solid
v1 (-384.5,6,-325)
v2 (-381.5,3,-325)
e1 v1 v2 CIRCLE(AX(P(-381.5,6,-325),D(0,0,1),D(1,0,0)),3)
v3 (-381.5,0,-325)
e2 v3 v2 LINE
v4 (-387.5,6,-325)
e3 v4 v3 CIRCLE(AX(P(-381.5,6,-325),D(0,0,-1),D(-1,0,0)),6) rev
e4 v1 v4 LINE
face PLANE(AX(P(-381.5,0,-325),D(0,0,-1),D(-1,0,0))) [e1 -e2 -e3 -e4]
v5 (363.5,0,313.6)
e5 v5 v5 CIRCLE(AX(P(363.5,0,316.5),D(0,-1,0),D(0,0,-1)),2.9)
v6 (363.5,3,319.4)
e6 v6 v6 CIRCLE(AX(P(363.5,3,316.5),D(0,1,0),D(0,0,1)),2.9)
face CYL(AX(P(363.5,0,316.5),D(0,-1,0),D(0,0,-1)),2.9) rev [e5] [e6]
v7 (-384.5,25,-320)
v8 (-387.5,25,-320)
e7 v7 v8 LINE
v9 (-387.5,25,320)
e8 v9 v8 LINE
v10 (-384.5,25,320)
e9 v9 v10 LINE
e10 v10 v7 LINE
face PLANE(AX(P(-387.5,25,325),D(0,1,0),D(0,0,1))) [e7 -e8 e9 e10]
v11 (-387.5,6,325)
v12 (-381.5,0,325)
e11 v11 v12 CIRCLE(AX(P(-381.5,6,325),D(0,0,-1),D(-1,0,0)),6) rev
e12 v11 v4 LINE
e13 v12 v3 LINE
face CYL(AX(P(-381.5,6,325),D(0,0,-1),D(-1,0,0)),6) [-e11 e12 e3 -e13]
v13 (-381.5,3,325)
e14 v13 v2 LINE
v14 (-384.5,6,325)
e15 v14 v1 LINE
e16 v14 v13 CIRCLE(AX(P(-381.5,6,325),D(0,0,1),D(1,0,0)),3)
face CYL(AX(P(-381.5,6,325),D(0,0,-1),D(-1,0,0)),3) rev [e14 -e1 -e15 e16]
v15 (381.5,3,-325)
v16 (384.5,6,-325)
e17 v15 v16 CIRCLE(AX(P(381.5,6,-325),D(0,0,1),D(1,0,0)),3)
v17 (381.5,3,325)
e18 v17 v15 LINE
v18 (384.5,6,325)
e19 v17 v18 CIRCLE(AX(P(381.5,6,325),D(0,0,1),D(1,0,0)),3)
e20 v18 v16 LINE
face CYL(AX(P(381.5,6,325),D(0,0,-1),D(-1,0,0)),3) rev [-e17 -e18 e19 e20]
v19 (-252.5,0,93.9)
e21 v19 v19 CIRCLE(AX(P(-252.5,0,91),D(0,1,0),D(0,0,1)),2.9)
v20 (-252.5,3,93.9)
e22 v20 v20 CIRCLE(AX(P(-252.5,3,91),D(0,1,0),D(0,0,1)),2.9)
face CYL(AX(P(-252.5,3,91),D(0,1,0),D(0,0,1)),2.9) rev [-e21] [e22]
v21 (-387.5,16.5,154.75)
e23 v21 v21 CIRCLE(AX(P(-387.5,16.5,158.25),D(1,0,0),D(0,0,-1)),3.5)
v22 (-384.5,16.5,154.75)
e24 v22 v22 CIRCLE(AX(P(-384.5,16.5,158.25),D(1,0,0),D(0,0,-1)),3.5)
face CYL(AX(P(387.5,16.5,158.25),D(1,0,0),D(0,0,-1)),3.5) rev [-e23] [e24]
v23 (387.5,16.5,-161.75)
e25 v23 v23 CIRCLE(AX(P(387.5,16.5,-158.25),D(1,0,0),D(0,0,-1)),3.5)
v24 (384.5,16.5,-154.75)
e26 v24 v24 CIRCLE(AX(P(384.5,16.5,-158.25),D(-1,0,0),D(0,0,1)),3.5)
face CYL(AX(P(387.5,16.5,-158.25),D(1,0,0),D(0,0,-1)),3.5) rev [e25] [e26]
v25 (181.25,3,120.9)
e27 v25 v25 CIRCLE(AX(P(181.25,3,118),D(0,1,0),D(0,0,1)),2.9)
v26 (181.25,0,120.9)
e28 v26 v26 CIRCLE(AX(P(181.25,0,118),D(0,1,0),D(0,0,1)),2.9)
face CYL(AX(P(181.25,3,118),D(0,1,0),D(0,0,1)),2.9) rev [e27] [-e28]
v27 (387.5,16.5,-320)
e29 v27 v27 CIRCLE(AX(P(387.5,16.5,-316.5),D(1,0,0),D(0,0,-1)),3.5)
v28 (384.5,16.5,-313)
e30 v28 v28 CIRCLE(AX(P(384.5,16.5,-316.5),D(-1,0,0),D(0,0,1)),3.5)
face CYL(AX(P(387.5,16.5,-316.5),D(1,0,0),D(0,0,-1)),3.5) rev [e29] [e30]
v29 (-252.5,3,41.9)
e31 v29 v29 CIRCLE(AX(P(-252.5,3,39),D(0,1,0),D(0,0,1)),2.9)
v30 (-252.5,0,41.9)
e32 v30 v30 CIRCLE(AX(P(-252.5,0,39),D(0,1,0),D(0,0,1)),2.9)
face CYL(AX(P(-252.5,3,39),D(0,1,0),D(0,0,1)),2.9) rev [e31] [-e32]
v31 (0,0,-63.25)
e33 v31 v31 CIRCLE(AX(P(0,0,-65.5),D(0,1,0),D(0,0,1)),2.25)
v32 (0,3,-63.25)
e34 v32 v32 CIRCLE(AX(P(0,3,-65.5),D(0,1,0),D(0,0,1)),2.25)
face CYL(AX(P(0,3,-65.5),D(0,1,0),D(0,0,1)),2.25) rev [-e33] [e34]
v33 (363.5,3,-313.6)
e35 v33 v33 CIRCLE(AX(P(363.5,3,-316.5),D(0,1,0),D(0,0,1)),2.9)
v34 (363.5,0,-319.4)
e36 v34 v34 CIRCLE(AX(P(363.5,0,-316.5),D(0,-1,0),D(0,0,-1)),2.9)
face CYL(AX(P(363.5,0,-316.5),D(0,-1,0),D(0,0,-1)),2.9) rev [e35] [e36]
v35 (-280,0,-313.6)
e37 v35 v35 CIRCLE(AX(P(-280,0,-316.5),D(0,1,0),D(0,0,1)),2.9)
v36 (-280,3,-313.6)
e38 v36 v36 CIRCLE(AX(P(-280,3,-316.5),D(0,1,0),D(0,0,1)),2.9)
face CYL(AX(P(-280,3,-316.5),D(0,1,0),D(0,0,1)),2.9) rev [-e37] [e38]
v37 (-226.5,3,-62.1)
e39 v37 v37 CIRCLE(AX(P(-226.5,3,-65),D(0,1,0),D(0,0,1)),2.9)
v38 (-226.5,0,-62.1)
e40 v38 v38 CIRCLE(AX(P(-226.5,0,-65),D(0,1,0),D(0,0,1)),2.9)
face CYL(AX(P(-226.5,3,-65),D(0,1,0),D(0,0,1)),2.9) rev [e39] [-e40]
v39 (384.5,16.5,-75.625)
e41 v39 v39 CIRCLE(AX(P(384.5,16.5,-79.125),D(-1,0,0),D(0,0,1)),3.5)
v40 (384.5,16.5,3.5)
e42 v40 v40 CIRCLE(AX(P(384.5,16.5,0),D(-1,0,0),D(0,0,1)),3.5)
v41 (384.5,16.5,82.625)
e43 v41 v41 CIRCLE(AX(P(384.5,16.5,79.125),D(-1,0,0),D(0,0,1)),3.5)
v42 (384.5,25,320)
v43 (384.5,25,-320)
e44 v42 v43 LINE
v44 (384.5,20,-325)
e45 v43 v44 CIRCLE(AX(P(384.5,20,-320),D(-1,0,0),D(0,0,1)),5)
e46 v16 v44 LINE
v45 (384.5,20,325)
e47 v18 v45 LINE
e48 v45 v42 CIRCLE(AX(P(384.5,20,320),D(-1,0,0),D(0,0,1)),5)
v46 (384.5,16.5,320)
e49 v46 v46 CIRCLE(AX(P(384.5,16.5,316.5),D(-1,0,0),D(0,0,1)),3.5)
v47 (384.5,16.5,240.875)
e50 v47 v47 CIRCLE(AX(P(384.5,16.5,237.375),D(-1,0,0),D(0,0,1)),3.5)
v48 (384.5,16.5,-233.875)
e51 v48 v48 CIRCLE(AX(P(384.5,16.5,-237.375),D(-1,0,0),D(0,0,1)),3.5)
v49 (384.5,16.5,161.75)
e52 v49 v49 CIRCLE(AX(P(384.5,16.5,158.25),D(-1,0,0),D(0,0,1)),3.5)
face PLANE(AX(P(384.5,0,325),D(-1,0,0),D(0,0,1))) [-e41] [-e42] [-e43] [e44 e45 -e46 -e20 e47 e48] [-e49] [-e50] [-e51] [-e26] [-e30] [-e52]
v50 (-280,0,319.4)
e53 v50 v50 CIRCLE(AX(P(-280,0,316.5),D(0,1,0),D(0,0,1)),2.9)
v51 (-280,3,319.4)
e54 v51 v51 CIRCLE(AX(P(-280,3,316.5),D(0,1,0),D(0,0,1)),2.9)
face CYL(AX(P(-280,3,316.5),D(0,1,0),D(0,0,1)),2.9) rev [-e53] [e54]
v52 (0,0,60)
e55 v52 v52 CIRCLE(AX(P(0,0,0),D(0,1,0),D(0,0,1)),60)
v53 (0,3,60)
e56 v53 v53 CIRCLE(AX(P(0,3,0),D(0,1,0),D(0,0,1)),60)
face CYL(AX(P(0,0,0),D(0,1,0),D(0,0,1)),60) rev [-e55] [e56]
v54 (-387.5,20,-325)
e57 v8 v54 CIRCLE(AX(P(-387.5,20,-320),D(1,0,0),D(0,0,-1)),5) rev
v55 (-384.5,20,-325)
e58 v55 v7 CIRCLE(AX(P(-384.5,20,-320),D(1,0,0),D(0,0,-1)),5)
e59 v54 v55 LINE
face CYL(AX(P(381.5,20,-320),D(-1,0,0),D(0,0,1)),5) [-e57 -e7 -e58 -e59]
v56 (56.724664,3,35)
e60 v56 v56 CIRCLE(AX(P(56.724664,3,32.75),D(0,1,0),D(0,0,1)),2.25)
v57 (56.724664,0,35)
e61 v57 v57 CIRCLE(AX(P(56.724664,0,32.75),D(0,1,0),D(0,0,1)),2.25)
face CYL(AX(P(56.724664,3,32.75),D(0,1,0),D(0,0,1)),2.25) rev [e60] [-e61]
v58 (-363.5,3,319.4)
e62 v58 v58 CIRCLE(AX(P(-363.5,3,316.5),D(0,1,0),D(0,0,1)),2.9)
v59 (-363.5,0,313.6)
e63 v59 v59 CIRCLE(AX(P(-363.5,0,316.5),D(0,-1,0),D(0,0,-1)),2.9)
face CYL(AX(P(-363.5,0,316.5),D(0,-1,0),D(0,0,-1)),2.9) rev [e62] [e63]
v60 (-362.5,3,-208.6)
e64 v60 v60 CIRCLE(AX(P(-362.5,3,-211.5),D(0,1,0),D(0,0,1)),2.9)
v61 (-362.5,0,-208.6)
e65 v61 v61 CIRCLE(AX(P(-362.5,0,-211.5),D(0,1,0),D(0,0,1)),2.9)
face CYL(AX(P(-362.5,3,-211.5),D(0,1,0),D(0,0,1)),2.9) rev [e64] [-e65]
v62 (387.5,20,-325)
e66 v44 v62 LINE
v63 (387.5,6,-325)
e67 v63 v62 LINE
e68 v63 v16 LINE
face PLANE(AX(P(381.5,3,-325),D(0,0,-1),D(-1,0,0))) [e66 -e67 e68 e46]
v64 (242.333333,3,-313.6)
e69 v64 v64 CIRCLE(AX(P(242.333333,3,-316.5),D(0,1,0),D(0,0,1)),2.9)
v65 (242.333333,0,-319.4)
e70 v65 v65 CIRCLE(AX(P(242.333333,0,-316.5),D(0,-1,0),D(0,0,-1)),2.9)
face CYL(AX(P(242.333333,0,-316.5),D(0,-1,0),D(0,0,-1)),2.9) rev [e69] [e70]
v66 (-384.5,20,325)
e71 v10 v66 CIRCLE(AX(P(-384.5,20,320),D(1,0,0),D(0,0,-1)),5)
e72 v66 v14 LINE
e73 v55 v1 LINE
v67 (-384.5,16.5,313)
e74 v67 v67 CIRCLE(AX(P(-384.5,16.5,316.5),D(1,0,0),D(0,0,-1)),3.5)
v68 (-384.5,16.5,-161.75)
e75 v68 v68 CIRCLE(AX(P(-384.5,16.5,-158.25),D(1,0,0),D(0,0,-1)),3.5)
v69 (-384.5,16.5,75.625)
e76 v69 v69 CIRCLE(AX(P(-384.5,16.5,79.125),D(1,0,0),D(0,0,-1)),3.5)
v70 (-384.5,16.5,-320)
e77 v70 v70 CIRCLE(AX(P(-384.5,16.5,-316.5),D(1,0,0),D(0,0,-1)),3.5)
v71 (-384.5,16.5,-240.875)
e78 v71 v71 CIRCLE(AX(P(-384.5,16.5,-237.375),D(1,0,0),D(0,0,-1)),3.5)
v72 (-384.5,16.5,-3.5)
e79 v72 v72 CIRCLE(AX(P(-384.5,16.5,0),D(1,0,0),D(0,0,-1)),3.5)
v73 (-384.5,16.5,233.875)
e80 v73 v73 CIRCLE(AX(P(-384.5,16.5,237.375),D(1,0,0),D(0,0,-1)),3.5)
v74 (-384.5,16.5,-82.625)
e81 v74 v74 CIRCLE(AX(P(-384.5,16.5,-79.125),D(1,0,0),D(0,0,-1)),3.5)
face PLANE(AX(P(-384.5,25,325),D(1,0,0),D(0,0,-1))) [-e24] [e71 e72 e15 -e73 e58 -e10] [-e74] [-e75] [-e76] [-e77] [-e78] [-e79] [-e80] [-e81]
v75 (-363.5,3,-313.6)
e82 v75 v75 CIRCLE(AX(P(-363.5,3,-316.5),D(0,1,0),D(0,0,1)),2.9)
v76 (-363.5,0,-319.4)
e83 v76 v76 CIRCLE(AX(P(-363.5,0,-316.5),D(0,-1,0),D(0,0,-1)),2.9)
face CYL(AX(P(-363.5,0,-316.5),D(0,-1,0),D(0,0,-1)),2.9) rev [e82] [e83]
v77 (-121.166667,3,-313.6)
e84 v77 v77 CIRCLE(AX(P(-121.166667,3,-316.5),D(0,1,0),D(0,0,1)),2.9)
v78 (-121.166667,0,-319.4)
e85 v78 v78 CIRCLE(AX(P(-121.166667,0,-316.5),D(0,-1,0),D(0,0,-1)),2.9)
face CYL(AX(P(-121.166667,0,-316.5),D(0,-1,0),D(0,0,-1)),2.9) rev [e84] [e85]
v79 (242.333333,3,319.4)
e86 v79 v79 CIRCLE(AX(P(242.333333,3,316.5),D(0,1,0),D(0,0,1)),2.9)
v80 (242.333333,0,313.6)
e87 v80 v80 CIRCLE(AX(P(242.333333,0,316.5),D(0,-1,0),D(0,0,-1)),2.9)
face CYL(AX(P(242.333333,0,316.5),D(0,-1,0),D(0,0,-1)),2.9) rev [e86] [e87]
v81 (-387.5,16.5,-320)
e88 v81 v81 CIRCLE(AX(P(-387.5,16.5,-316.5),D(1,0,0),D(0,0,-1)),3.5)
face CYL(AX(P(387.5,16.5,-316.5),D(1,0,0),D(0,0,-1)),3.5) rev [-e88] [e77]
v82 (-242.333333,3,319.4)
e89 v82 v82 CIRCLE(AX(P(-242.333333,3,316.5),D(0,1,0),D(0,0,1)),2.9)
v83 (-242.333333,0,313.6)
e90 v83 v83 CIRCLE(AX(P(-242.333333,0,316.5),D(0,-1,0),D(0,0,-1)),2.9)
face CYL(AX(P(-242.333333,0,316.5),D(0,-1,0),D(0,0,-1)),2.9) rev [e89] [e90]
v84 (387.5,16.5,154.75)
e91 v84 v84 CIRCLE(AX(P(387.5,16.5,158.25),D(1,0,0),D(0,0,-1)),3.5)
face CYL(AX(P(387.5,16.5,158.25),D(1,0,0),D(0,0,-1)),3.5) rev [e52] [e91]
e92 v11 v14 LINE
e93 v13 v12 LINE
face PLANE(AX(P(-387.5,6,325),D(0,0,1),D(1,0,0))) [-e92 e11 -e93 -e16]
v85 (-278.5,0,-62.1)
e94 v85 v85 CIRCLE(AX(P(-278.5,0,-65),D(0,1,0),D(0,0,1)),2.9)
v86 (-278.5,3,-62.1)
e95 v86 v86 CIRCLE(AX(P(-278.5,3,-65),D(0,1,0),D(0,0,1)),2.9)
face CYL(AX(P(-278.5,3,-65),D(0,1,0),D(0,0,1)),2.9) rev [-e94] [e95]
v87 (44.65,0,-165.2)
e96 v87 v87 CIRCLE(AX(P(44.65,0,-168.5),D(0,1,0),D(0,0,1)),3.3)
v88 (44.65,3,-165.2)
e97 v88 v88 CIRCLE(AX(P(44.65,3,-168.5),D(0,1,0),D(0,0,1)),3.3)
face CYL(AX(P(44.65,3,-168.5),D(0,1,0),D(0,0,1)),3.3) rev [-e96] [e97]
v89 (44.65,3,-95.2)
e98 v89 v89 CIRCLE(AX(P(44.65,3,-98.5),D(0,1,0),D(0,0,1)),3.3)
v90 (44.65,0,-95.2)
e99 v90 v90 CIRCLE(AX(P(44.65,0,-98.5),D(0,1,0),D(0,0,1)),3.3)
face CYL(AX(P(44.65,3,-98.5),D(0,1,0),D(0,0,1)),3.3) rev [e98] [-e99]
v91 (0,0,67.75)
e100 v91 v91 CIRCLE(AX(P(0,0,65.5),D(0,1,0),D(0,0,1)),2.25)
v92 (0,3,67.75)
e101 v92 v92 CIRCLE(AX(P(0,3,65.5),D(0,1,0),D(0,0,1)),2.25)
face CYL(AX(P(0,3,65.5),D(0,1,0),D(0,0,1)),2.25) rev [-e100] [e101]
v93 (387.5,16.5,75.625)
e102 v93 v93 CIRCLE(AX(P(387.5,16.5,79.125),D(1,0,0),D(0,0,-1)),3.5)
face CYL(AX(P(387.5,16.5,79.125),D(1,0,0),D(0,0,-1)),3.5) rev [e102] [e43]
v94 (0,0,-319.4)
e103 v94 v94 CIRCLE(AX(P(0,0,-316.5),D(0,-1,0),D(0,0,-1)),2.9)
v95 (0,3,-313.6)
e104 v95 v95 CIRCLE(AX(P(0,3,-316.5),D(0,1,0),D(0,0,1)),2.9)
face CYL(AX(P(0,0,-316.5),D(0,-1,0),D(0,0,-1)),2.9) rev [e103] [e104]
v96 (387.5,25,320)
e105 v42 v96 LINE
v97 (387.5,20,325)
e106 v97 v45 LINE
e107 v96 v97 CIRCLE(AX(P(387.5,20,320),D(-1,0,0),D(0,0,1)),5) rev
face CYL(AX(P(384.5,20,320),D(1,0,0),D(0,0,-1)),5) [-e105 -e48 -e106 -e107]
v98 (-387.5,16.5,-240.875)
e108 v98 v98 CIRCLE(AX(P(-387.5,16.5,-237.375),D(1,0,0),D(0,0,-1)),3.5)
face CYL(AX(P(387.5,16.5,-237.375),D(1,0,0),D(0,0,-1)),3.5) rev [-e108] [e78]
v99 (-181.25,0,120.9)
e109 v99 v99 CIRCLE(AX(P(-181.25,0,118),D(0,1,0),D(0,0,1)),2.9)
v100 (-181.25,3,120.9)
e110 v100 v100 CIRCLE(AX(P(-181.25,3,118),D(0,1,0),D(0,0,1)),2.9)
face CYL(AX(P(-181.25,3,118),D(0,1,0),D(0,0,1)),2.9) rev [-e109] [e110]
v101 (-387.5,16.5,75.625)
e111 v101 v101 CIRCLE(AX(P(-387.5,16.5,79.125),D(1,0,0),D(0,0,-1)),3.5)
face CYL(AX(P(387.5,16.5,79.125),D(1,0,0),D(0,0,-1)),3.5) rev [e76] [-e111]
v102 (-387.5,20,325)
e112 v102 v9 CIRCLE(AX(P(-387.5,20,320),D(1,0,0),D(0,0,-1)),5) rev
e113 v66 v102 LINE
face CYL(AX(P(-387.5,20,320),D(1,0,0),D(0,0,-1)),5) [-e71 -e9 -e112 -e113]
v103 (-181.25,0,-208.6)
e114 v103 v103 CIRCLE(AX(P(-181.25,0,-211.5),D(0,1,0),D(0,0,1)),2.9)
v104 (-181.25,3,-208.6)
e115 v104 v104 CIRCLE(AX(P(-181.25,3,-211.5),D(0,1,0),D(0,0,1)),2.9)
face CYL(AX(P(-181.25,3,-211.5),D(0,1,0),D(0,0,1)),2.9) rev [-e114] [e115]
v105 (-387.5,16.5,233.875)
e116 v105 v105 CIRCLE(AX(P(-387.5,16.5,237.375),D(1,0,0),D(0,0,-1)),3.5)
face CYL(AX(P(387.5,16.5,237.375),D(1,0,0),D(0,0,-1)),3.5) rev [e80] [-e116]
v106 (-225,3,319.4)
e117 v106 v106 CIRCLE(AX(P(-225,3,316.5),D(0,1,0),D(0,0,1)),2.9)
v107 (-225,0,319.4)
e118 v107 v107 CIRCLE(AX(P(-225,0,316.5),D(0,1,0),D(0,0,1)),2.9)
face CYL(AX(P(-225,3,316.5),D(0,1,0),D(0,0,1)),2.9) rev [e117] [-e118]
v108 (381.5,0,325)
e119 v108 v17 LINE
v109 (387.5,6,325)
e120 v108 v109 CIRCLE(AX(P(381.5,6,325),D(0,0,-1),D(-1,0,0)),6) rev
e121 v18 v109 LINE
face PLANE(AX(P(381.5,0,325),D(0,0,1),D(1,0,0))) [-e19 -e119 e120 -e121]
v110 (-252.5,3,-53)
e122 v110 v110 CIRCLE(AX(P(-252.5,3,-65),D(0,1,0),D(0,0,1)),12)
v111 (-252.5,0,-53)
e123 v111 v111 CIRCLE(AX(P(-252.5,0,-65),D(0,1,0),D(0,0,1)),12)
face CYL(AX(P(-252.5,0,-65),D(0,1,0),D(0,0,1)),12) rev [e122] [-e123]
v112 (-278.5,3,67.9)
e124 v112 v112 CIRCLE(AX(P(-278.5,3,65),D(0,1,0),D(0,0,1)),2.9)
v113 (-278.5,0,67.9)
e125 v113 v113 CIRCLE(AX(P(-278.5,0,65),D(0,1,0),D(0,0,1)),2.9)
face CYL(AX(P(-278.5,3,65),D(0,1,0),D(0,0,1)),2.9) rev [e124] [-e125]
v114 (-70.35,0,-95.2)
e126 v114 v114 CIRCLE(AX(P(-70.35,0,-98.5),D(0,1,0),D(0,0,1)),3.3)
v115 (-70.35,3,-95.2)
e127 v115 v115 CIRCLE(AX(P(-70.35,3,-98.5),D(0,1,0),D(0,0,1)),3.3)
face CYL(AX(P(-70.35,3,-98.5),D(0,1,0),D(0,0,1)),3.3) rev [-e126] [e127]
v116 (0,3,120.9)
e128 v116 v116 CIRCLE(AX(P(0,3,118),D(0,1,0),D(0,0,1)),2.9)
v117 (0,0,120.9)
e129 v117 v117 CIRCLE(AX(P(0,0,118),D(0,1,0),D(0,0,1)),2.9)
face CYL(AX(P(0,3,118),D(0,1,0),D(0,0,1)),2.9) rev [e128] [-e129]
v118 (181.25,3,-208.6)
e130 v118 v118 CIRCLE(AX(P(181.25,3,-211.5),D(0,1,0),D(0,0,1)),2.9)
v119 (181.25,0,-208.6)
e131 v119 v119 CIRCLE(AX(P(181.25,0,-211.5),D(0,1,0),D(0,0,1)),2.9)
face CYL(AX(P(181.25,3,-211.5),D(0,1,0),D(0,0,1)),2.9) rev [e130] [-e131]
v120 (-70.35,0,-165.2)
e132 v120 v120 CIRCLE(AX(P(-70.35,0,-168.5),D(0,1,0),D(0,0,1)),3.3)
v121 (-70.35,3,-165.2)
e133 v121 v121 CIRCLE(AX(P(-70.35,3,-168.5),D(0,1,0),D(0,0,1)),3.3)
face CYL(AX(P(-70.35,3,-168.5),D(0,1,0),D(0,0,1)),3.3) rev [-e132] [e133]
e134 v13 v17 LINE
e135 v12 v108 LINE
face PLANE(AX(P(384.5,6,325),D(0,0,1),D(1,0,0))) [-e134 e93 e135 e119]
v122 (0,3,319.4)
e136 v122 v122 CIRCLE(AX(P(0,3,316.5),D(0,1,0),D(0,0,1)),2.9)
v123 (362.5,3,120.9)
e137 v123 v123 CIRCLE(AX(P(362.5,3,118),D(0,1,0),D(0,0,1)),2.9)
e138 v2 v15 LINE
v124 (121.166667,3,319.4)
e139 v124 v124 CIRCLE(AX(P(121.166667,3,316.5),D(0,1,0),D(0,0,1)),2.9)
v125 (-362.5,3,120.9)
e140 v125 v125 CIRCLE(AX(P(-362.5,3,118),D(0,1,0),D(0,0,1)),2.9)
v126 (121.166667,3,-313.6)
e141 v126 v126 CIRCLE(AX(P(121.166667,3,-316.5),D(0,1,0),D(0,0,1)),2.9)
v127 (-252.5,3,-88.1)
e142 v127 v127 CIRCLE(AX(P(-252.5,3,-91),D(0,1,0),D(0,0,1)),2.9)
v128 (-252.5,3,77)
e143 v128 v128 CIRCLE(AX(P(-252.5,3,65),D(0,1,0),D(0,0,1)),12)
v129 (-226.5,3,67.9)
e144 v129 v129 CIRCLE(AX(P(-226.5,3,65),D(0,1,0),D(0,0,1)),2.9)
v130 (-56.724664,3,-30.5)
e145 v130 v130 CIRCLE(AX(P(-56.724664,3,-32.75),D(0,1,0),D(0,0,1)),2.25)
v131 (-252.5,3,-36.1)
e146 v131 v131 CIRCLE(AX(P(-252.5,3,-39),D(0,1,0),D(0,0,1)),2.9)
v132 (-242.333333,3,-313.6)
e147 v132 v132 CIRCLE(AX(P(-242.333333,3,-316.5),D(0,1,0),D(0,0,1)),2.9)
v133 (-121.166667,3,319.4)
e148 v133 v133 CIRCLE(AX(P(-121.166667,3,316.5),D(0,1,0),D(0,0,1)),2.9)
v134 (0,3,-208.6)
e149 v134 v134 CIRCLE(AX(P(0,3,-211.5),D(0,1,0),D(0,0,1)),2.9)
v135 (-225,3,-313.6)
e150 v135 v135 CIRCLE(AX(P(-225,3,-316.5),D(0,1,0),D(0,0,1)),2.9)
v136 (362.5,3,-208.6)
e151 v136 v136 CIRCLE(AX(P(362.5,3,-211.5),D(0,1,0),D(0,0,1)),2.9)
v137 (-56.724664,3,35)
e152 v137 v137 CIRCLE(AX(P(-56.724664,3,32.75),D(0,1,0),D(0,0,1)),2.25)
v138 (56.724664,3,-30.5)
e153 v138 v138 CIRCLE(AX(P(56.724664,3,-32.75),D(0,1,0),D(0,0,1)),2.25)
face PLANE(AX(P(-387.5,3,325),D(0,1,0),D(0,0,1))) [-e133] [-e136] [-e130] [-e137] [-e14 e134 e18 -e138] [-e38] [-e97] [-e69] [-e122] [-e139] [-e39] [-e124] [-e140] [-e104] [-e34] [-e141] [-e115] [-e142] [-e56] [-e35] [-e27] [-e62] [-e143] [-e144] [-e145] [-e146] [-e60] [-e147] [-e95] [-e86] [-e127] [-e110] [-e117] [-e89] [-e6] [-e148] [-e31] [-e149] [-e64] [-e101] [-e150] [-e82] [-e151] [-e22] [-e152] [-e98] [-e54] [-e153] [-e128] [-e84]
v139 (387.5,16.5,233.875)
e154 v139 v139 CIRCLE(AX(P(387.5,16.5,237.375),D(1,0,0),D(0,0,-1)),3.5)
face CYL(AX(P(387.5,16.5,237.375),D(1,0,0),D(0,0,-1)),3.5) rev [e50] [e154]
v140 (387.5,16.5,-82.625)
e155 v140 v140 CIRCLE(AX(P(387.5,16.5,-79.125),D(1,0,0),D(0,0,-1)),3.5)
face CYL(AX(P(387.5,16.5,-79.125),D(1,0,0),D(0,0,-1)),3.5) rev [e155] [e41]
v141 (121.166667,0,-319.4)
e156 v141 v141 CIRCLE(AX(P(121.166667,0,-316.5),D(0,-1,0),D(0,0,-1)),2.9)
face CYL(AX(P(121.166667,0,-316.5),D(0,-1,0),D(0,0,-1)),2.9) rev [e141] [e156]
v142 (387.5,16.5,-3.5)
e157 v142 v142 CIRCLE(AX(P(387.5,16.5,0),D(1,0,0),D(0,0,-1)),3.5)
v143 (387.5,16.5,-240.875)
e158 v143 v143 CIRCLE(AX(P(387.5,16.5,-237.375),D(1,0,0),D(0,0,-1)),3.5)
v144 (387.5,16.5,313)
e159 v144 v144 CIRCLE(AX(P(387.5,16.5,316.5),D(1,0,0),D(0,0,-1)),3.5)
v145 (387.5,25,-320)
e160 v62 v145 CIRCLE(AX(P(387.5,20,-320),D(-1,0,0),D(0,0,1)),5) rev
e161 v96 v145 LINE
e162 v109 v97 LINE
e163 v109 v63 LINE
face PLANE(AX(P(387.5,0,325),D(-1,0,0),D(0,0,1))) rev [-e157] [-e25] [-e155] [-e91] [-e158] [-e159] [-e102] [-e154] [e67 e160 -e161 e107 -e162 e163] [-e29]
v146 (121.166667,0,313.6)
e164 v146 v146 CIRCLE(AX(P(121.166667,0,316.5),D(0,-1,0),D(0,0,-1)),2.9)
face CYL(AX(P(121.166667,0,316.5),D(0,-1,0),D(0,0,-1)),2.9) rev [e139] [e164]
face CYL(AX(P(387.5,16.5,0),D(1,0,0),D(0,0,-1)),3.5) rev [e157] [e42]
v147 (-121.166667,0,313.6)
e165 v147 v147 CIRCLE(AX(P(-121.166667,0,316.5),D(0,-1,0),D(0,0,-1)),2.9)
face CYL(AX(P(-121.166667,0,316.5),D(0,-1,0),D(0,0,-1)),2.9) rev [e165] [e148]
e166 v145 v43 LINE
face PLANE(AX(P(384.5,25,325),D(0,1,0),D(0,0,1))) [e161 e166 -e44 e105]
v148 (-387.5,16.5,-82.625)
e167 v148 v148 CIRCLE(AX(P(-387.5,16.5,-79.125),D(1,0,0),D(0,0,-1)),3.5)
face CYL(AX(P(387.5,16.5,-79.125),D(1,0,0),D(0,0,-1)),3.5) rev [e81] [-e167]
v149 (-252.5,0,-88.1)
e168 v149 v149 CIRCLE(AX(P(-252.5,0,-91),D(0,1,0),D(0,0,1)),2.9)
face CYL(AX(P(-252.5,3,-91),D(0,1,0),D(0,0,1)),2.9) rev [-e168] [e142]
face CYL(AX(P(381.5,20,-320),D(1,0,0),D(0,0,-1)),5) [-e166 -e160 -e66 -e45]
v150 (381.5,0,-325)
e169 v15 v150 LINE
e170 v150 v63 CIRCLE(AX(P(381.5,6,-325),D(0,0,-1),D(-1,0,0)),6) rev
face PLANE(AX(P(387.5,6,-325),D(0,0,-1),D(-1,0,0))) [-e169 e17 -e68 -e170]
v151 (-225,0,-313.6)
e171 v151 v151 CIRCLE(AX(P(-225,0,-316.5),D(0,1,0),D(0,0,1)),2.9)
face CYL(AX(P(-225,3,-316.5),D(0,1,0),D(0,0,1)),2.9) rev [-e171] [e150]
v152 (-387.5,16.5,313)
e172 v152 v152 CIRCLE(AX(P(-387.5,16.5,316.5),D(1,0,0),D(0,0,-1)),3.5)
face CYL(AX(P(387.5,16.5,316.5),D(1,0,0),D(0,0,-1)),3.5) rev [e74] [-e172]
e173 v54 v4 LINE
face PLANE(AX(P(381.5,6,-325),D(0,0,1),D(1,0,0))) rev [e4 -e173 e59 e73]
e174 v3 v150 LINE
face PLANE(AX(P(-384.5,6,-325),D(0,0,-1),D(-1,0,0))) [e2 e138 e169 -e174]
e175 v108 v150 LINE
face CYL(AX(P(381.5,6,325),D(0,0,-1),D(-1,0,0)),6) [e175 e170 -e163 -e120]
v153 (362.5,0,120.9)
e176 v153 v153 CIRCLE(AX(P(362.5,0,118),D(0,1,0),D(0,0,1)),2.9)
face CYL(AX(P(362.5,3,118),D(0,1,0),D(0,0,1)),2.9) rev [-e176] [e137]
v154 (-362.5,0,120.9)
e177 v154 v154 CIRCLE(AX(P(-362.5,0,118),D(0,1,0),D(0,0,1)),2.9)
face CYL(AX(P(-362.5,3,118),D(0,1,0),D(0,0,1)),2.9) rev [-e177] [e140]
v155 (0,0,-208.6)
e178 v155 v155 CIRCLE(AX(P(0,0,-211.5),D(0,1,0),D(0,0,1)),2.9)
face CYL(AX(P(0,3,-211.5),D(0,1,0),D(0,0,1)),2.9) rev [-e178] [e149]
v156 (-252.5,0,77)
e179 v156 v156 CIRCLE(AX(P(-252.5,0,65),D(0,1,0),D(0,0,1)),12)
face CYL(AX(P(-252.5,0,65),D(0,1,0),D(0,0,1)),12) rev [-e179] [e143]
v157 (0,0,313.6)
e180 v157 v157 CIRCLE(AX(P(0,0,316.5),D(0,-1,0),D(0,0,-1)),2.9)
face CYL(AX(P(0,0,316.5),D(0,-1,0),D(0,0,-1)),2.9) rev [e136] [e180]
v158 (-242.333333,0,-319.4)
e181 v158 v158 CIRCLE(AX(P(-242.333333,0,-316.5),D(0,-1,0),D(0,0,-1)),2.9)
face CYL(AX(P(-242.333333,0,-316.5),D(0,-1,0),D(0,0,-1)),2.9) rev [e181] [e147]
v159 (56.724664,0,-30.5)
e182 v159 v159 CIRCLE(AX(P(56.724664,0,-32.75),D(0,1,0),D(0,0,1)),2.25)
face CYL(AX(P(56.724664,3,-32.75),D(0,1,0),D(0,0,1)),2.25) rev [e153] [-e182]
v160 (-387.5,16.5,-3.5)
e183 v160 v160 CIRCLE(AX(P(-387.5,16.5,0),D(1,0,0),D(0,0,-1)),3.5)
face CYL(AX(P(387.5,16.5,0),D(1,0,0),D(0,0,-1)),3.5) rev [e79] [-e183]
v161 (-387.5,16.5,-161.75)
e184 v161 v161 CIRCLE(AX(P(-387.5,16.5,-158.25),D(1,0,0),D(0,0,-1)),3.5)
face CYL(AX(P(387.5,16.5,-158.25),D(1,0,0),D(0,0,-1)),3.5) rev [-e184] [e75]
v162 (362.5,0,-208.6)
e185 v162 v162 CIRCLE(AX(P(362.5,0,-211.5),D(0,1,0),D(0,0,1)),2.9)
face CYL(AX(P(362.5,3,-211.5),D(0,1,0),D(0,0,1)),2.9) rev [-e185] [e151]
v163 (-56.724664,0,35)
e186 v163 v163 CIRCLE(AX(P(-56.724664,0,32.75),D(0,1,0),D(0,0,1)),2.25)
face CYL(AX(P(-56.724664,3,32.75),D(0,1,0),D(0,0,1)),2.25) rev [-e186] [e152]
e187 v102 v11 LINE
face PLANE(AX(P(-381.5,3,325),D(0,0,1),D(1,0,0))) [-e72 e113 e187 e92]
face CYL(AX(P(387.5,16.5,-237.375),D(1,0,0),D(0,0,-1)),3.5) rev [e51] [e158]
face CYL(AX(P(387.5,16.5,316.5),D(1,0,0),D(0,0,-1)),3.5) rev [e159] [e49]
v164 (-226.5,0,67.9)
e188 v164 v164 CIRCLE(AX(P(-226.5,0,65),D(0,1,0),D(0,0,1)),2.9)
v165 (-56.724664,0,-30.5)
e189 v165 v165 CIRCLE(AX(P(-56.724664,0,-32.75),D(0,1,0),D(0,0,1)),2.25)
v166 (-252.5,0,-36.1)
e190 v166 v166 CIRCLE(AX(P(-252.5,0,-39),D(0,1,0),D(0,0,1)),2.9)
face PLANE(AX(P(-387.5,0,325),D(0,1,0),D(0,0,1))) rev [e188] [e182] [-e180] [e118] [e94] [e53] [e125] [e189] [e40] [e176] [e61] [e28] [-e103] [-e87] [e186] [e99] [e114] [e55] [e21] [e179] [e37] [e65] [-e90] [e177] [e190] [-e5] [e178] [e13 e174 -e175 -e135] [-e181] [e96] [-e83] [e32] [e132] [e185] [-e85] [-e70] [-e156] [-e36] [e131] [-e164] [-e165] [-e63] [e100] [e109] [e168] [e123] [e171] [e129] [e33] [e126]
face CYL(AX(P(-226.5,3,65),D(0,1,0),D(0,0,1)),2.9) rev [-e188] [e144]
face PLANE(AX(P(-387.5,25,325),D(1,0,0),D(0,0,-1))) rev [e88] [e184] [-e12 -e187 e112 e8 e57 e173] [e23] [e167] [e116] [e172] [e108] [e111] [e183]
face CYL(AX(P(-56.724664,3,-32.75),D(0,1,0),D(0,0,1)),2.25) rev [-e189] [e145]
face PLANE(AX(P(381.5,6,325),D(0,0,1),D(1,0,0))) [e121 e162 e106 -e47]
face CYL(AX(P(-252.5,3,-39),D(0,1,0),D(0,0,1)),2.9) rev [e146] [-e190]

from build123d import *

# Parameters (mm, degrees)
BASE_FLANGE1_DEPTH       = 325
F_7_0_7_DIAMETER_HOLE1_D = 7
M5_CLEARANCE_HOLE1_D     = 5.8
SKETCH6_R                = 60
CUT_EXTRUDE1_DEPTH       = 3
M4_CLEARANCE_HOLE1_D     = 4.5
M6_CLEARANCE_HOLE1_D     = 6.6
M5_CLEARANCE_HOLE4_D     = 5.8
SKETCH13_R               = 12
CUT_EXTRUDE2_DEPTH       = 3
M5_CLEARANCE_HOLE2_D     = 5.8
M5_CLEARANCE_HOLE3_D     = 5.8
FILLET1_R                = 5


# Sheet-metal steps are written as plain solids
with BuildPart() as part:
    # Base-Flange1: sheet metal written as solids
    # Sketch1 → Base-Flange1 (new, symmetric)
    with BuildSketch(Plane.XY):
        with BuildLine():
            Line((-387.5, 25), (-387.5, 6))
            ThreePointArc((-387.5, 6), (-385.742640687, 1.757359313), (-381.5, 0))
            Line((-381.5, 0), (381.5, 0))
            ThreePointArc((381.5, 0), (385.742640687, 1.757359313), (387.5, 6))
            Line((387.5, 6), (387.5, 25))
            Line((387.5, 25), (384.5, 25))
            Line((384.5, 25), (384.5, 6))
            ThreePointArc((384.5, 6), (383.621320344, 3.878679656), (381.5, 3))
            Line((381.5, 3), (-381.5, 3))
            ThreePointArc((-381.5, 3), (-383.621320344, 3.878679656), (-384.5, 6))
            Line((-384.5, 6), (-384.5, 25))
            Line((-384.5, 25), (-387.5, 25))
        make_face()
    extrude(amount=BASE_FLANGE1_DEPTH, both=True)

    # Ø7.0 (7) Diameter Hole1 (through all)
    with Locations(Plane(origin=(387.5, 0, 0), x_dir=(0, 0, -1), z_dir=(1, 0, 0))):
        with Locations((-316.5, 16.5), (-237.375, 16.5), (-158.25, 16.5), (-79.125, 16.5), (0, 16.5), (79.125, 16.5), (158.25, 16.5), (237.375, 16.5), (316.5, 16.5)):
            Hole(F_7_0_7_DIAMETER_HOLE1_D / 2)

    # M5 Clearance Hole1 (through all)
    with Locations(Plane(origin=(0, 0, 0), x_dir=(-1, 0, 0), z_dir=(0, -1, 0))):
        with Locations((-363.5, 316.5), (-242.333333333, 316.5), (-121.166666667, 316.5), (0, 316.5), (121.166666667, 316.5), (242.333333333, 316.5), (363.5, 316.5)):
            m5_clearance_hole1 = Hole(M5_CLEARANCE_HOLE1_D / 2)

    # Mirror1: M5 Clearance Hole1 across plane
    add(m5_clearance_hole1.mirror(Plane.XY), mode=Mode.SUBTRACT)

    # Sketch6 → Cut-Extrude1 (cut)
    with BuildSketch(Plane(origin=(0, 3, 0), x_dir=(1, 0, 0), z_dir=(0, 1, 0))):
        with Locations(Location((0, 0, 0), (0, 0, 270))):
            Circle(SKETCH6_R)
    extrude(amount=-CUT_EXTRUDE1_DEPTH, mode=Mode.SUBTRACT)

    # M4 Clearance Hole1 (through all)
    with Locations(Plane(origin=(0, 3, 0), x_dir=(1, 0, 0), z_dir=(0, 1, 0))):
        with Locations((0, -65.5), (-56.724663948, -32.75), (-56.724663948, 32.75), (0, 65.5), (56.724663948, 32.75), (56.724663948, -32.75)):
            Hole(M4_CLEARANCE_HOLE1_D / 2)

    # M6 Clearance Hole1 (through all)
    with Locations(Plane(origin=(0, 3, 0), x_dir=(1, 0, 0), z_dir=(0, 1, 0))):
        with Locations((-70.35, 168.5), (44.65, 168.5), (-70.35, 98.5), (44.65, 98.5)):
            Hole(M6_CLEARANCE_HOLE1_D / 2)

    # M5 Clearance Hole4 (through all)
    with Locations(Plane(origin=(0, 3, 0), x_dir=(1, 0, 0), z_dir=(0, 1, 0))):
        with Locations((-362.5, 211.5), (-181.25, 211.5), (0, 211.5), (181.25, 211.5), (362.5, 211.5), (181.25, -118), (362.5, -118), (0, -118), (-181.25, -118), (-362.5, -118)):
            Hole(M5_CLEARANCE_HOLE4_D / 2)

    # Sketch13 → Cut-Extrude2 (cut)
    with BuildSketch(Plane(origin=(0, 3, 0), x_dir=(1, 0, 0), z_dir=(0, 1, 0))):
        with Locations(Location((-252.5, 65, 0), (0, 0, 270))):
            Circle(SKETCH13_R)
        with Locations(Location((-252.5, -65, 0), (0, 0, 270))):
            Circle(SKETCH13_R)
    extrude(amount=-CUT_EXTRUDE2_DEPTH, mode=Mode.SUBTRACT)

    # M5 Clearance Hole2 (through all)
    with Locations(Plane(origin=(0, 3, 0), x_dir=(1, 0, 0), z_dir=(0, 1, 0))):
        with Locations((-278.5, 65), (-252.5, 91), (-252.5, 39), (-226.5, 65), (-278.5, -65), (-226.5, -65), (-252.5, -91), (-252.5, -39)):
            Hole(M5_CLEARANCE_HOLE2_D / 2)

    # M5 Clearance Hole3 (through all)
    with Locations(Plane(origin=(0, 3, 0), x_dir=(1, 0, 0), z_dir=(0, 1, 0))):
        with Locations((-280, 316.5), (-225, 316.5), (-280, -316.5), (-225, -316.5)):
            Hole(M5_CLEARANCE_HOLE3_D / 2)

    # Fillet1
    fillet1_edges = [part.edges().sort_by_distance(p)[0] for p in [
        (-386, 25, -325),
        (386, 25, -325),
        (-386, 25, 325),
        (386, 25, 325),
    ]]
    fillet(fillet1_edges, radius=FILLET1_R)


solid = part.part
